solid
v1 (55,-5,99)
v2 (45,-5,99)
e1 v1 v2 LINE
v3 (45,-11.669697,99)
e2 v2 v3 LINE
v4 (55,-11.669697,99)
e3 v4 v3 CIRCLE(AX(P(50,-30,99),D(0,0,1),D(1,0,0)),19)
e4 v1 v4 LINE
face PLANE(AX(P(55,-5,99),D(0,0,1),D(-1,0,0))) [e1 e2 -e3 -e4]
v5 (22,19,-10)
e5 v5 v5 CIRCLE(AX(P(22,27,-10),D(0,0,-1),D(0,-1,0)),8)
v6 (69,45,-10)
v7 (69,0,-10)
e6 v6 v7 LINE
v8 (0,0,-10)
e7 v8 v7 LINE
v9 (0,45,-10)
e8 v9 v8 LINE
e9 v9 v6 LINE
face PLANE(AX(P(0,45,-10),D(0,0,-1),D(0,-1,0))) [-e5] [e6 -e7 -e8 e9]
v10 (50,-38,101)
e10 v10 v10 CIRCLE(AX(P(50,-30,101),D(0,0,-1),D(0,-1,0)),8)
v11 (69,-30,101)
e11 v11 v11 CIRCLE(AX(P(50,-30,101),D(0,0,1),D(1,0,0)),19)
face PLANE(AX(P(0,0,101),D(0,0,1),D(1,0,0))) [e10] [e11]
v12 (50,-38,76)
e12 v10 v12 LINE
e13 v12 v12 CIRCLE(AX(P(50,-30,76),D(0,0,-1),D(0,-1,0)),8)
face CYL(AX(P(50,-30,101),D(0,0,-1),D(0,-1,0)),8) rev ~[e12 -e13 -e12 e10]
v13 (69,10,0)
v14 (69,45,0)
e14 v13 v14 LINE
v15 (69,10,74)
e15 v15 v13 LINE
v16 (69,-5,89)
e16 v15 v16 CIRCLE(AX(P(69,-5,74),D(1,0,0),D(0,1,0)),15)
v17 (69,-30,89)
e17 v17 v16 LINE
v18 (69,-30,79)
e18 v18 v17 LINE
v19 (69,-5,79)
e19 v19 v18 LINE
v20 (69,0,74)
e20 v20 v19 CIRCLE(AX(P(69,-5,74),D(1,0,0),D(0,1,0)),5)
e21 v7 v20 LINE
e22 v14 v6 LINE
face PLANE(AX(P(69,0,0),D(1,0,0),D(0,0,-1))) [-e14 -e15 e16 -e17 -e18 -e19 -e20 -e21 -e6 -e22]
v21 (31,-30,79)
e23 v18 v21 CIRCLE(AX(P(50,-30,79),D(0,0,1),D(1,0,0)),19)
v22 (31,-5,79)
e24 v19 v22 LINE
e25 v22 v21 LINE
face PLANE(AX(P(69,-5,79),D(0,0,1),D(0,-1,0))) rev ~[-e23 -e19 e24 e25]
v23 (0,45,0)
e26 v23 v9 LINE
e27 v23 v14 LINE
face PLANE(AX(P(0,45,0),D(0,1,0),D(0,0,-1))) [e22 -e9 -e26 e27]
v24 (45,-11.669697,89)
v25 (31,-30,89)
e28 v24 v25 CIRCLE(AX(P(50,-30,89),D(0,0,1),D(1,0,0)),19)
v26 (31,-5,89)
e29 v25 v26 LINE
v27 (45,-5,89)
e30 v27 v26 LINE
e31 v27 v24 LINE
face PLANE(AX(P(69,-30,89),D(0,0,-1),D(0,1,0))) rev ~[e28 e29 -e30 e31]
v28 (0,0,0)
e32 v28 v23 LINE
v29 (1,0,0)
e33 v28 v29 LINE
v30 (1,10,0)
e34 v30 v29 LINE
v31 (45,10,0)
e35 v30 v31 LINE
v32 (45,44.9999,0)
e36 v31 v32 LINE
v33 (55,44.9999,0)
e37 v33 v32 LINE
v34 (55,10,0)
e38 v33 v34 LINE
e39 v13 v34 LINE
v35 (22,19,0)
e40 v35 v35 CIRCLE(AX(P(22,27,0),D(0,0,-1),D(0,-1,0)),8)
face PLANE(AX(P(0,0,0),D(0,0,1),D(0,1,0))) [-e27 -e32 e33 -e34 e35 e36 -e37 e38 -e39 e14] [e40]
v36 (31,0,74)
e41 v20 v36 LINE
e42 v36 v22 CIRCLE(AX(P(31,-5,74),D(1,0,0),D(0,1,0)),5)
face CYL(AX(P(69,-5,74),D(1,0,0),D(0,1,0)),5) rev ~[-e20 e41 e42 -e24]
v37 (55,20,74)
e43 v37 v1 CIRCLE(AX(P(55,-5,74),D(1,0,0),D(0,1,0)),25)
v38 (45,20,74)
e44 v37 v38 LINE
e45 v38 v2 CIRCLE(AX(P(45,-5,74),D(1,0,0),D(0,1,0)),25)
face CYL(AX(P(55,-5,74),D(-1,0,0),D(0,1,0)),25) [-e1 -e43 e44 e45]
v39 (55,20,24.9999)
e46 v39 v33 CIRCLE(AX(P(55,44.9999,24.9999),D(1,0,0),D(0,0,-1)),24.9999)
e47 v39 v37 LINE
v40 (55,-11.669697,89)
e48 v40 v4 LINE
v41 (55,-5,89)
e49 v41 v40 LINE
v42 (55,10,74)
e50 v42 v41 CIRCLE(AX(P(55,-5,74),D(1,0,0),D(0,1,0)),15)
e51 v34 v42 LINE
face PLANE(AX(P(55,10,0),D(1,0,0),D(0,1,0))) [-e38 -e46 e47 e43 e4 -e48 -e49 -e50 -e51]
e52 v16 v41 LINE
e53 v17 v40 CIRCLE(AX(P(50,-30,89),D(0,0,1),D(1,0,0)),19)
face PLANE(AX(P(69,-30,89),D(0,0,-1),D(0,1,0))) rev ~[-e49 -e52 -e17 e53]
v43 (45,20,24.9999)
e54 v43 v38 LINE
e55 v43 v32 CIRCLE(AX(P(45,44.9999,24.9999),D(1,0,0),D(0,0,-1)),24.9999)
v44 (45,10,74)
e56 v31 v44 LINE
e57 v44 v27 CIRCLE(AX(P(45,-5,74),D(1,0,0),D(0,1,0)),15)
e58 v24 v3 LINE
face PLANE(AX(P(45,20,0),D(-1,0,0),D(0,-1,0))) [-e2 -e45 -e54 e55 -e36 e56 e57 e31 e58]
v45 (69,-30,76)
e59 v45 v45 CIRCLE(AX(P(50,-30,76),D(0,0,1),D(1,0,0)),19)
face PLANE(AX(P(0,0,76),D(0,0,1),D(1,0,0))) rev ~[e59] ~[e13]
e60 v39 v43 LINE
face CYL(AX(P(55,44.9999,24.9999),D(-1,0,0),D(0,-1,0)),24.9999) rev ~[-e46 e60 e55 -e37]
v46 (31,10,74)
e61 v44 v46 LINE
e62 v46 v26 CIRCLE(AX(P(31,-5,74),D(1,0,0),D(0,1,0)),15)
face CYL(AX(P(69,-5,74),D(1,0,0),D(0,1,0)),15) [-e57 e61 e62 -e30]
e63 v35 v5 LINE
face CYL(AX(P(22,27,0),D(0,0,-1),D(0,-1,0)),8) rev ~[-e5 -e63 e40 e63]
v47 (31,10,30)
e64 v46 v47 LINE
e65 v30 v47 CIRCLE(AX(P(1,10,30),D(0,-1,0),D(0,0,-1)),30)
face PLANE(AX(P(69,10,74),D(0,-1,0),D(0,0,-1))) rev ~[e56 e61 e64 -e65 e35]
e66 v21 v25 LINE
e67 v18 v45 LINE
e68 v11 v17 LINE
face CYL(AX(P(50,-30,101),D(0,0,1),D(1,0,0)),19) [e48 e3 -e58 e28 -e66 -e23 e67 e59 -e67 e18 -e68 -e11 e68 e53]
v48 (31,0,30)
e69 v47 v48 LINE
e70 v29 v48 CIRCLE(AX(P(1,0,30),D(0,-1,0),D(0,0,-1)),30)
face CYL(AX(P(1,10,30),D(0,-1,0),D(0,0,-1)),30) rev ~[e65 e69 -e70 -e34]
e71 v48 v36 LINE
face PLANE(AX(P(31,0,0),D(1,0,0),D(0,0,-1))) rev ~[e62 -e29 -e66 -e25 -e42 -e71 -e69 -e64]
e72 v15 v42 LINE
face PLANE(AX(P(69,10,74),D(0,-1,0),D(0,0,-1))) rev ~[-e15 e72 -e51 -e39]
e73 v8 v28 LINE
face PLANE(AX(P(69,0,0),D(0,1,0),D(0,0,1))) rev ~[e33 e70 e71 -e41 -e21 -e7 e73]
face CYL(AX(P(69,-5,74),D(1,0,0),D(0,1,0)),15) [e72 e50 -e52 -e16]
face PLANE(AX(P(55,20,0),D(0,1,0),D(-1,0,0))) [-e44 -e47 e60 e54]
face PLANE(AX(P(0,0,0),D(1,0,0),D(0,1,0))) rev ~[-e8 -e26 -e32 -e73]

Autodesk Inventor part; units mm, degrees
ref_plane "YZ Plane" through (0, 0, 0) normal (1, 0, 0) x (0, 1, 0)
ref_plane "XZ Plane" through (0, 0, 0) normal (0, 1, 0) x (-1, 0, 0)
sketch "Esboço1" plane through (0, 0, 0) normal (1, 0, 0) x (0, 1, 0)
  line L0 (0, 0) -> (45, 0)
  line L1 (45, 0) -> (45, -10)
  line L2 (45, -10) -> (0, -10)
  line L3 (0, -10) -> (0, 0)
  dimension "d0" = 45
  dimension "d1" = 10
extrude "Extrusão1" add sketch "Esboço1" along normal blind 69
ref_plane "Plano de trabalho1" through (0, 0, 101) normal (0, 0, 1) x (1, 0, 0)
sketch "Esboço2" plane through (0, 0, 101) normal (0, 0, 1) x (1, 0, 0)
  circle A0 centre (50, -30) radius 19
  line L0 (69, 45) -> (69, 0) projected
  line L1 (0, 45) -> (69, 45) projected
  point P0 (0, 0)
  dimension "d5" = 38
  dimension "d6" = 75
sketch "Esboço3" plane through (69, 0, 0) normal (1, 0, 0) x (0, 0, -1)
  point P0 (0, 0)
extrude "Extrusão2" add sketch "Esboço2" against normal blind 25
sketch "Esboço4" plane through (69, 0, 0) normal (1, 0, 0) x (0, 0, -1)
  point P0 (0, 0)
sketch "Esboço5" plane through (69, 0, 0) normal (1, 0, 0) x (0, 0, -1)
  line L0 (0, 0) -> (-74, 0)
  line L1 (-79, -5) -> (-79, -30)
  line L2 (-79, -30) -> (-89, -30)
  line L3 (-89, -30) -> (-89, -5)
  line L4 (-74, 10) -> (0, 10)
  line L5 (0, 10) -> (0, 0)
  line L6 (-101, -11) -> (-101, -49) construction
  line L7 (-101, -30) -> (-76, -30) construction
  line L8 (-76, -49) -> (-76, -11) construction
  arc A0 (-74, 0) -> (-79, -5) centre (-74, -5) ccw
  arc A1 (-74, 10) -> (-89, -5) centre (-74, -5) ccw
  dimension "d9" = 10
  dimension "d10" = 3
  dimension "d11" = 5
  dimension "d12" = 15
  dimension "d20" = 12
extrude "Extrusão3" add sketch "Esboço5" against normal blind 38
sketch "Esboço6" plane through (0, 0, 0) normal (0, 0, 1) x (1, 0, 0)
  line L0 (31, 10) -> (69, 10) projected
  line L1 (45, 10) -> (55, 10)
  line L2 (55, 10) -> (55, 20)
  line L3 (55, 20) -> (45, 20)
  line L4 (45, 20) -> (45, 10)
  line L5 (31, 10) -> (31, -5) projected
  point P0 (0, 0)
  dimension "d15" = 10
  dimension "d16" = 10
  dimension "d17" = 14
sketch3d "Esboço 3D1"
  line L0 (69, 10, 0) -> (69, 10, 74)
  arc A0 (69, 10, 74) -> (69, -5, 89) centre (69, -5, 74) ccw
  line L1 (69, -5, 89) -> (69, -30, 89)
sweep "Varredura1" add profiles "Esboço6" path "Esboço 3D1"
sketch "Esboço7" plane through (45, 10, 0) normal (-1, 0, 0) x (0, 0, 1)
  point P0 (0, -10)
sketch "Esboço8" plane through (45, 10, 0) normal (-1, 0, 0) x (0, 0, 1)
  point P0 (0, -10)
fillet "Arredondamento1" radius 25 1 edges at (50, 20, 0)
fillet "Arredondamento2" radius 30 1 edges at (31, 5, 0)
sketch "Esboço9" plane through (50, -30, 101) normal (0, 0, 1) x (1, 0, 0)
  circle A0 centre (0, 0) radius 19 projected
  point P0 (-50, 30)
hole "Furo1" at (50, -30, 101) direction (0, 0, -1) diameter 16 end through all
sketch "Esboço10" plane through (0, 0, 0) normal (0, 0, 1) x (1, 0, 0)
  line L0 (0, 45) -> (45, 45) projected
  line L1 (0, 45) -> (0, 0) projected
  point P0 (22, 27)
  dimension "d30" = 18
  dimension "d31" = 22
hole "Furo2" at (22, 27, 0) direction (0, 0, -1) diameter 16 end through all
properties part number "Peça teste 2"
